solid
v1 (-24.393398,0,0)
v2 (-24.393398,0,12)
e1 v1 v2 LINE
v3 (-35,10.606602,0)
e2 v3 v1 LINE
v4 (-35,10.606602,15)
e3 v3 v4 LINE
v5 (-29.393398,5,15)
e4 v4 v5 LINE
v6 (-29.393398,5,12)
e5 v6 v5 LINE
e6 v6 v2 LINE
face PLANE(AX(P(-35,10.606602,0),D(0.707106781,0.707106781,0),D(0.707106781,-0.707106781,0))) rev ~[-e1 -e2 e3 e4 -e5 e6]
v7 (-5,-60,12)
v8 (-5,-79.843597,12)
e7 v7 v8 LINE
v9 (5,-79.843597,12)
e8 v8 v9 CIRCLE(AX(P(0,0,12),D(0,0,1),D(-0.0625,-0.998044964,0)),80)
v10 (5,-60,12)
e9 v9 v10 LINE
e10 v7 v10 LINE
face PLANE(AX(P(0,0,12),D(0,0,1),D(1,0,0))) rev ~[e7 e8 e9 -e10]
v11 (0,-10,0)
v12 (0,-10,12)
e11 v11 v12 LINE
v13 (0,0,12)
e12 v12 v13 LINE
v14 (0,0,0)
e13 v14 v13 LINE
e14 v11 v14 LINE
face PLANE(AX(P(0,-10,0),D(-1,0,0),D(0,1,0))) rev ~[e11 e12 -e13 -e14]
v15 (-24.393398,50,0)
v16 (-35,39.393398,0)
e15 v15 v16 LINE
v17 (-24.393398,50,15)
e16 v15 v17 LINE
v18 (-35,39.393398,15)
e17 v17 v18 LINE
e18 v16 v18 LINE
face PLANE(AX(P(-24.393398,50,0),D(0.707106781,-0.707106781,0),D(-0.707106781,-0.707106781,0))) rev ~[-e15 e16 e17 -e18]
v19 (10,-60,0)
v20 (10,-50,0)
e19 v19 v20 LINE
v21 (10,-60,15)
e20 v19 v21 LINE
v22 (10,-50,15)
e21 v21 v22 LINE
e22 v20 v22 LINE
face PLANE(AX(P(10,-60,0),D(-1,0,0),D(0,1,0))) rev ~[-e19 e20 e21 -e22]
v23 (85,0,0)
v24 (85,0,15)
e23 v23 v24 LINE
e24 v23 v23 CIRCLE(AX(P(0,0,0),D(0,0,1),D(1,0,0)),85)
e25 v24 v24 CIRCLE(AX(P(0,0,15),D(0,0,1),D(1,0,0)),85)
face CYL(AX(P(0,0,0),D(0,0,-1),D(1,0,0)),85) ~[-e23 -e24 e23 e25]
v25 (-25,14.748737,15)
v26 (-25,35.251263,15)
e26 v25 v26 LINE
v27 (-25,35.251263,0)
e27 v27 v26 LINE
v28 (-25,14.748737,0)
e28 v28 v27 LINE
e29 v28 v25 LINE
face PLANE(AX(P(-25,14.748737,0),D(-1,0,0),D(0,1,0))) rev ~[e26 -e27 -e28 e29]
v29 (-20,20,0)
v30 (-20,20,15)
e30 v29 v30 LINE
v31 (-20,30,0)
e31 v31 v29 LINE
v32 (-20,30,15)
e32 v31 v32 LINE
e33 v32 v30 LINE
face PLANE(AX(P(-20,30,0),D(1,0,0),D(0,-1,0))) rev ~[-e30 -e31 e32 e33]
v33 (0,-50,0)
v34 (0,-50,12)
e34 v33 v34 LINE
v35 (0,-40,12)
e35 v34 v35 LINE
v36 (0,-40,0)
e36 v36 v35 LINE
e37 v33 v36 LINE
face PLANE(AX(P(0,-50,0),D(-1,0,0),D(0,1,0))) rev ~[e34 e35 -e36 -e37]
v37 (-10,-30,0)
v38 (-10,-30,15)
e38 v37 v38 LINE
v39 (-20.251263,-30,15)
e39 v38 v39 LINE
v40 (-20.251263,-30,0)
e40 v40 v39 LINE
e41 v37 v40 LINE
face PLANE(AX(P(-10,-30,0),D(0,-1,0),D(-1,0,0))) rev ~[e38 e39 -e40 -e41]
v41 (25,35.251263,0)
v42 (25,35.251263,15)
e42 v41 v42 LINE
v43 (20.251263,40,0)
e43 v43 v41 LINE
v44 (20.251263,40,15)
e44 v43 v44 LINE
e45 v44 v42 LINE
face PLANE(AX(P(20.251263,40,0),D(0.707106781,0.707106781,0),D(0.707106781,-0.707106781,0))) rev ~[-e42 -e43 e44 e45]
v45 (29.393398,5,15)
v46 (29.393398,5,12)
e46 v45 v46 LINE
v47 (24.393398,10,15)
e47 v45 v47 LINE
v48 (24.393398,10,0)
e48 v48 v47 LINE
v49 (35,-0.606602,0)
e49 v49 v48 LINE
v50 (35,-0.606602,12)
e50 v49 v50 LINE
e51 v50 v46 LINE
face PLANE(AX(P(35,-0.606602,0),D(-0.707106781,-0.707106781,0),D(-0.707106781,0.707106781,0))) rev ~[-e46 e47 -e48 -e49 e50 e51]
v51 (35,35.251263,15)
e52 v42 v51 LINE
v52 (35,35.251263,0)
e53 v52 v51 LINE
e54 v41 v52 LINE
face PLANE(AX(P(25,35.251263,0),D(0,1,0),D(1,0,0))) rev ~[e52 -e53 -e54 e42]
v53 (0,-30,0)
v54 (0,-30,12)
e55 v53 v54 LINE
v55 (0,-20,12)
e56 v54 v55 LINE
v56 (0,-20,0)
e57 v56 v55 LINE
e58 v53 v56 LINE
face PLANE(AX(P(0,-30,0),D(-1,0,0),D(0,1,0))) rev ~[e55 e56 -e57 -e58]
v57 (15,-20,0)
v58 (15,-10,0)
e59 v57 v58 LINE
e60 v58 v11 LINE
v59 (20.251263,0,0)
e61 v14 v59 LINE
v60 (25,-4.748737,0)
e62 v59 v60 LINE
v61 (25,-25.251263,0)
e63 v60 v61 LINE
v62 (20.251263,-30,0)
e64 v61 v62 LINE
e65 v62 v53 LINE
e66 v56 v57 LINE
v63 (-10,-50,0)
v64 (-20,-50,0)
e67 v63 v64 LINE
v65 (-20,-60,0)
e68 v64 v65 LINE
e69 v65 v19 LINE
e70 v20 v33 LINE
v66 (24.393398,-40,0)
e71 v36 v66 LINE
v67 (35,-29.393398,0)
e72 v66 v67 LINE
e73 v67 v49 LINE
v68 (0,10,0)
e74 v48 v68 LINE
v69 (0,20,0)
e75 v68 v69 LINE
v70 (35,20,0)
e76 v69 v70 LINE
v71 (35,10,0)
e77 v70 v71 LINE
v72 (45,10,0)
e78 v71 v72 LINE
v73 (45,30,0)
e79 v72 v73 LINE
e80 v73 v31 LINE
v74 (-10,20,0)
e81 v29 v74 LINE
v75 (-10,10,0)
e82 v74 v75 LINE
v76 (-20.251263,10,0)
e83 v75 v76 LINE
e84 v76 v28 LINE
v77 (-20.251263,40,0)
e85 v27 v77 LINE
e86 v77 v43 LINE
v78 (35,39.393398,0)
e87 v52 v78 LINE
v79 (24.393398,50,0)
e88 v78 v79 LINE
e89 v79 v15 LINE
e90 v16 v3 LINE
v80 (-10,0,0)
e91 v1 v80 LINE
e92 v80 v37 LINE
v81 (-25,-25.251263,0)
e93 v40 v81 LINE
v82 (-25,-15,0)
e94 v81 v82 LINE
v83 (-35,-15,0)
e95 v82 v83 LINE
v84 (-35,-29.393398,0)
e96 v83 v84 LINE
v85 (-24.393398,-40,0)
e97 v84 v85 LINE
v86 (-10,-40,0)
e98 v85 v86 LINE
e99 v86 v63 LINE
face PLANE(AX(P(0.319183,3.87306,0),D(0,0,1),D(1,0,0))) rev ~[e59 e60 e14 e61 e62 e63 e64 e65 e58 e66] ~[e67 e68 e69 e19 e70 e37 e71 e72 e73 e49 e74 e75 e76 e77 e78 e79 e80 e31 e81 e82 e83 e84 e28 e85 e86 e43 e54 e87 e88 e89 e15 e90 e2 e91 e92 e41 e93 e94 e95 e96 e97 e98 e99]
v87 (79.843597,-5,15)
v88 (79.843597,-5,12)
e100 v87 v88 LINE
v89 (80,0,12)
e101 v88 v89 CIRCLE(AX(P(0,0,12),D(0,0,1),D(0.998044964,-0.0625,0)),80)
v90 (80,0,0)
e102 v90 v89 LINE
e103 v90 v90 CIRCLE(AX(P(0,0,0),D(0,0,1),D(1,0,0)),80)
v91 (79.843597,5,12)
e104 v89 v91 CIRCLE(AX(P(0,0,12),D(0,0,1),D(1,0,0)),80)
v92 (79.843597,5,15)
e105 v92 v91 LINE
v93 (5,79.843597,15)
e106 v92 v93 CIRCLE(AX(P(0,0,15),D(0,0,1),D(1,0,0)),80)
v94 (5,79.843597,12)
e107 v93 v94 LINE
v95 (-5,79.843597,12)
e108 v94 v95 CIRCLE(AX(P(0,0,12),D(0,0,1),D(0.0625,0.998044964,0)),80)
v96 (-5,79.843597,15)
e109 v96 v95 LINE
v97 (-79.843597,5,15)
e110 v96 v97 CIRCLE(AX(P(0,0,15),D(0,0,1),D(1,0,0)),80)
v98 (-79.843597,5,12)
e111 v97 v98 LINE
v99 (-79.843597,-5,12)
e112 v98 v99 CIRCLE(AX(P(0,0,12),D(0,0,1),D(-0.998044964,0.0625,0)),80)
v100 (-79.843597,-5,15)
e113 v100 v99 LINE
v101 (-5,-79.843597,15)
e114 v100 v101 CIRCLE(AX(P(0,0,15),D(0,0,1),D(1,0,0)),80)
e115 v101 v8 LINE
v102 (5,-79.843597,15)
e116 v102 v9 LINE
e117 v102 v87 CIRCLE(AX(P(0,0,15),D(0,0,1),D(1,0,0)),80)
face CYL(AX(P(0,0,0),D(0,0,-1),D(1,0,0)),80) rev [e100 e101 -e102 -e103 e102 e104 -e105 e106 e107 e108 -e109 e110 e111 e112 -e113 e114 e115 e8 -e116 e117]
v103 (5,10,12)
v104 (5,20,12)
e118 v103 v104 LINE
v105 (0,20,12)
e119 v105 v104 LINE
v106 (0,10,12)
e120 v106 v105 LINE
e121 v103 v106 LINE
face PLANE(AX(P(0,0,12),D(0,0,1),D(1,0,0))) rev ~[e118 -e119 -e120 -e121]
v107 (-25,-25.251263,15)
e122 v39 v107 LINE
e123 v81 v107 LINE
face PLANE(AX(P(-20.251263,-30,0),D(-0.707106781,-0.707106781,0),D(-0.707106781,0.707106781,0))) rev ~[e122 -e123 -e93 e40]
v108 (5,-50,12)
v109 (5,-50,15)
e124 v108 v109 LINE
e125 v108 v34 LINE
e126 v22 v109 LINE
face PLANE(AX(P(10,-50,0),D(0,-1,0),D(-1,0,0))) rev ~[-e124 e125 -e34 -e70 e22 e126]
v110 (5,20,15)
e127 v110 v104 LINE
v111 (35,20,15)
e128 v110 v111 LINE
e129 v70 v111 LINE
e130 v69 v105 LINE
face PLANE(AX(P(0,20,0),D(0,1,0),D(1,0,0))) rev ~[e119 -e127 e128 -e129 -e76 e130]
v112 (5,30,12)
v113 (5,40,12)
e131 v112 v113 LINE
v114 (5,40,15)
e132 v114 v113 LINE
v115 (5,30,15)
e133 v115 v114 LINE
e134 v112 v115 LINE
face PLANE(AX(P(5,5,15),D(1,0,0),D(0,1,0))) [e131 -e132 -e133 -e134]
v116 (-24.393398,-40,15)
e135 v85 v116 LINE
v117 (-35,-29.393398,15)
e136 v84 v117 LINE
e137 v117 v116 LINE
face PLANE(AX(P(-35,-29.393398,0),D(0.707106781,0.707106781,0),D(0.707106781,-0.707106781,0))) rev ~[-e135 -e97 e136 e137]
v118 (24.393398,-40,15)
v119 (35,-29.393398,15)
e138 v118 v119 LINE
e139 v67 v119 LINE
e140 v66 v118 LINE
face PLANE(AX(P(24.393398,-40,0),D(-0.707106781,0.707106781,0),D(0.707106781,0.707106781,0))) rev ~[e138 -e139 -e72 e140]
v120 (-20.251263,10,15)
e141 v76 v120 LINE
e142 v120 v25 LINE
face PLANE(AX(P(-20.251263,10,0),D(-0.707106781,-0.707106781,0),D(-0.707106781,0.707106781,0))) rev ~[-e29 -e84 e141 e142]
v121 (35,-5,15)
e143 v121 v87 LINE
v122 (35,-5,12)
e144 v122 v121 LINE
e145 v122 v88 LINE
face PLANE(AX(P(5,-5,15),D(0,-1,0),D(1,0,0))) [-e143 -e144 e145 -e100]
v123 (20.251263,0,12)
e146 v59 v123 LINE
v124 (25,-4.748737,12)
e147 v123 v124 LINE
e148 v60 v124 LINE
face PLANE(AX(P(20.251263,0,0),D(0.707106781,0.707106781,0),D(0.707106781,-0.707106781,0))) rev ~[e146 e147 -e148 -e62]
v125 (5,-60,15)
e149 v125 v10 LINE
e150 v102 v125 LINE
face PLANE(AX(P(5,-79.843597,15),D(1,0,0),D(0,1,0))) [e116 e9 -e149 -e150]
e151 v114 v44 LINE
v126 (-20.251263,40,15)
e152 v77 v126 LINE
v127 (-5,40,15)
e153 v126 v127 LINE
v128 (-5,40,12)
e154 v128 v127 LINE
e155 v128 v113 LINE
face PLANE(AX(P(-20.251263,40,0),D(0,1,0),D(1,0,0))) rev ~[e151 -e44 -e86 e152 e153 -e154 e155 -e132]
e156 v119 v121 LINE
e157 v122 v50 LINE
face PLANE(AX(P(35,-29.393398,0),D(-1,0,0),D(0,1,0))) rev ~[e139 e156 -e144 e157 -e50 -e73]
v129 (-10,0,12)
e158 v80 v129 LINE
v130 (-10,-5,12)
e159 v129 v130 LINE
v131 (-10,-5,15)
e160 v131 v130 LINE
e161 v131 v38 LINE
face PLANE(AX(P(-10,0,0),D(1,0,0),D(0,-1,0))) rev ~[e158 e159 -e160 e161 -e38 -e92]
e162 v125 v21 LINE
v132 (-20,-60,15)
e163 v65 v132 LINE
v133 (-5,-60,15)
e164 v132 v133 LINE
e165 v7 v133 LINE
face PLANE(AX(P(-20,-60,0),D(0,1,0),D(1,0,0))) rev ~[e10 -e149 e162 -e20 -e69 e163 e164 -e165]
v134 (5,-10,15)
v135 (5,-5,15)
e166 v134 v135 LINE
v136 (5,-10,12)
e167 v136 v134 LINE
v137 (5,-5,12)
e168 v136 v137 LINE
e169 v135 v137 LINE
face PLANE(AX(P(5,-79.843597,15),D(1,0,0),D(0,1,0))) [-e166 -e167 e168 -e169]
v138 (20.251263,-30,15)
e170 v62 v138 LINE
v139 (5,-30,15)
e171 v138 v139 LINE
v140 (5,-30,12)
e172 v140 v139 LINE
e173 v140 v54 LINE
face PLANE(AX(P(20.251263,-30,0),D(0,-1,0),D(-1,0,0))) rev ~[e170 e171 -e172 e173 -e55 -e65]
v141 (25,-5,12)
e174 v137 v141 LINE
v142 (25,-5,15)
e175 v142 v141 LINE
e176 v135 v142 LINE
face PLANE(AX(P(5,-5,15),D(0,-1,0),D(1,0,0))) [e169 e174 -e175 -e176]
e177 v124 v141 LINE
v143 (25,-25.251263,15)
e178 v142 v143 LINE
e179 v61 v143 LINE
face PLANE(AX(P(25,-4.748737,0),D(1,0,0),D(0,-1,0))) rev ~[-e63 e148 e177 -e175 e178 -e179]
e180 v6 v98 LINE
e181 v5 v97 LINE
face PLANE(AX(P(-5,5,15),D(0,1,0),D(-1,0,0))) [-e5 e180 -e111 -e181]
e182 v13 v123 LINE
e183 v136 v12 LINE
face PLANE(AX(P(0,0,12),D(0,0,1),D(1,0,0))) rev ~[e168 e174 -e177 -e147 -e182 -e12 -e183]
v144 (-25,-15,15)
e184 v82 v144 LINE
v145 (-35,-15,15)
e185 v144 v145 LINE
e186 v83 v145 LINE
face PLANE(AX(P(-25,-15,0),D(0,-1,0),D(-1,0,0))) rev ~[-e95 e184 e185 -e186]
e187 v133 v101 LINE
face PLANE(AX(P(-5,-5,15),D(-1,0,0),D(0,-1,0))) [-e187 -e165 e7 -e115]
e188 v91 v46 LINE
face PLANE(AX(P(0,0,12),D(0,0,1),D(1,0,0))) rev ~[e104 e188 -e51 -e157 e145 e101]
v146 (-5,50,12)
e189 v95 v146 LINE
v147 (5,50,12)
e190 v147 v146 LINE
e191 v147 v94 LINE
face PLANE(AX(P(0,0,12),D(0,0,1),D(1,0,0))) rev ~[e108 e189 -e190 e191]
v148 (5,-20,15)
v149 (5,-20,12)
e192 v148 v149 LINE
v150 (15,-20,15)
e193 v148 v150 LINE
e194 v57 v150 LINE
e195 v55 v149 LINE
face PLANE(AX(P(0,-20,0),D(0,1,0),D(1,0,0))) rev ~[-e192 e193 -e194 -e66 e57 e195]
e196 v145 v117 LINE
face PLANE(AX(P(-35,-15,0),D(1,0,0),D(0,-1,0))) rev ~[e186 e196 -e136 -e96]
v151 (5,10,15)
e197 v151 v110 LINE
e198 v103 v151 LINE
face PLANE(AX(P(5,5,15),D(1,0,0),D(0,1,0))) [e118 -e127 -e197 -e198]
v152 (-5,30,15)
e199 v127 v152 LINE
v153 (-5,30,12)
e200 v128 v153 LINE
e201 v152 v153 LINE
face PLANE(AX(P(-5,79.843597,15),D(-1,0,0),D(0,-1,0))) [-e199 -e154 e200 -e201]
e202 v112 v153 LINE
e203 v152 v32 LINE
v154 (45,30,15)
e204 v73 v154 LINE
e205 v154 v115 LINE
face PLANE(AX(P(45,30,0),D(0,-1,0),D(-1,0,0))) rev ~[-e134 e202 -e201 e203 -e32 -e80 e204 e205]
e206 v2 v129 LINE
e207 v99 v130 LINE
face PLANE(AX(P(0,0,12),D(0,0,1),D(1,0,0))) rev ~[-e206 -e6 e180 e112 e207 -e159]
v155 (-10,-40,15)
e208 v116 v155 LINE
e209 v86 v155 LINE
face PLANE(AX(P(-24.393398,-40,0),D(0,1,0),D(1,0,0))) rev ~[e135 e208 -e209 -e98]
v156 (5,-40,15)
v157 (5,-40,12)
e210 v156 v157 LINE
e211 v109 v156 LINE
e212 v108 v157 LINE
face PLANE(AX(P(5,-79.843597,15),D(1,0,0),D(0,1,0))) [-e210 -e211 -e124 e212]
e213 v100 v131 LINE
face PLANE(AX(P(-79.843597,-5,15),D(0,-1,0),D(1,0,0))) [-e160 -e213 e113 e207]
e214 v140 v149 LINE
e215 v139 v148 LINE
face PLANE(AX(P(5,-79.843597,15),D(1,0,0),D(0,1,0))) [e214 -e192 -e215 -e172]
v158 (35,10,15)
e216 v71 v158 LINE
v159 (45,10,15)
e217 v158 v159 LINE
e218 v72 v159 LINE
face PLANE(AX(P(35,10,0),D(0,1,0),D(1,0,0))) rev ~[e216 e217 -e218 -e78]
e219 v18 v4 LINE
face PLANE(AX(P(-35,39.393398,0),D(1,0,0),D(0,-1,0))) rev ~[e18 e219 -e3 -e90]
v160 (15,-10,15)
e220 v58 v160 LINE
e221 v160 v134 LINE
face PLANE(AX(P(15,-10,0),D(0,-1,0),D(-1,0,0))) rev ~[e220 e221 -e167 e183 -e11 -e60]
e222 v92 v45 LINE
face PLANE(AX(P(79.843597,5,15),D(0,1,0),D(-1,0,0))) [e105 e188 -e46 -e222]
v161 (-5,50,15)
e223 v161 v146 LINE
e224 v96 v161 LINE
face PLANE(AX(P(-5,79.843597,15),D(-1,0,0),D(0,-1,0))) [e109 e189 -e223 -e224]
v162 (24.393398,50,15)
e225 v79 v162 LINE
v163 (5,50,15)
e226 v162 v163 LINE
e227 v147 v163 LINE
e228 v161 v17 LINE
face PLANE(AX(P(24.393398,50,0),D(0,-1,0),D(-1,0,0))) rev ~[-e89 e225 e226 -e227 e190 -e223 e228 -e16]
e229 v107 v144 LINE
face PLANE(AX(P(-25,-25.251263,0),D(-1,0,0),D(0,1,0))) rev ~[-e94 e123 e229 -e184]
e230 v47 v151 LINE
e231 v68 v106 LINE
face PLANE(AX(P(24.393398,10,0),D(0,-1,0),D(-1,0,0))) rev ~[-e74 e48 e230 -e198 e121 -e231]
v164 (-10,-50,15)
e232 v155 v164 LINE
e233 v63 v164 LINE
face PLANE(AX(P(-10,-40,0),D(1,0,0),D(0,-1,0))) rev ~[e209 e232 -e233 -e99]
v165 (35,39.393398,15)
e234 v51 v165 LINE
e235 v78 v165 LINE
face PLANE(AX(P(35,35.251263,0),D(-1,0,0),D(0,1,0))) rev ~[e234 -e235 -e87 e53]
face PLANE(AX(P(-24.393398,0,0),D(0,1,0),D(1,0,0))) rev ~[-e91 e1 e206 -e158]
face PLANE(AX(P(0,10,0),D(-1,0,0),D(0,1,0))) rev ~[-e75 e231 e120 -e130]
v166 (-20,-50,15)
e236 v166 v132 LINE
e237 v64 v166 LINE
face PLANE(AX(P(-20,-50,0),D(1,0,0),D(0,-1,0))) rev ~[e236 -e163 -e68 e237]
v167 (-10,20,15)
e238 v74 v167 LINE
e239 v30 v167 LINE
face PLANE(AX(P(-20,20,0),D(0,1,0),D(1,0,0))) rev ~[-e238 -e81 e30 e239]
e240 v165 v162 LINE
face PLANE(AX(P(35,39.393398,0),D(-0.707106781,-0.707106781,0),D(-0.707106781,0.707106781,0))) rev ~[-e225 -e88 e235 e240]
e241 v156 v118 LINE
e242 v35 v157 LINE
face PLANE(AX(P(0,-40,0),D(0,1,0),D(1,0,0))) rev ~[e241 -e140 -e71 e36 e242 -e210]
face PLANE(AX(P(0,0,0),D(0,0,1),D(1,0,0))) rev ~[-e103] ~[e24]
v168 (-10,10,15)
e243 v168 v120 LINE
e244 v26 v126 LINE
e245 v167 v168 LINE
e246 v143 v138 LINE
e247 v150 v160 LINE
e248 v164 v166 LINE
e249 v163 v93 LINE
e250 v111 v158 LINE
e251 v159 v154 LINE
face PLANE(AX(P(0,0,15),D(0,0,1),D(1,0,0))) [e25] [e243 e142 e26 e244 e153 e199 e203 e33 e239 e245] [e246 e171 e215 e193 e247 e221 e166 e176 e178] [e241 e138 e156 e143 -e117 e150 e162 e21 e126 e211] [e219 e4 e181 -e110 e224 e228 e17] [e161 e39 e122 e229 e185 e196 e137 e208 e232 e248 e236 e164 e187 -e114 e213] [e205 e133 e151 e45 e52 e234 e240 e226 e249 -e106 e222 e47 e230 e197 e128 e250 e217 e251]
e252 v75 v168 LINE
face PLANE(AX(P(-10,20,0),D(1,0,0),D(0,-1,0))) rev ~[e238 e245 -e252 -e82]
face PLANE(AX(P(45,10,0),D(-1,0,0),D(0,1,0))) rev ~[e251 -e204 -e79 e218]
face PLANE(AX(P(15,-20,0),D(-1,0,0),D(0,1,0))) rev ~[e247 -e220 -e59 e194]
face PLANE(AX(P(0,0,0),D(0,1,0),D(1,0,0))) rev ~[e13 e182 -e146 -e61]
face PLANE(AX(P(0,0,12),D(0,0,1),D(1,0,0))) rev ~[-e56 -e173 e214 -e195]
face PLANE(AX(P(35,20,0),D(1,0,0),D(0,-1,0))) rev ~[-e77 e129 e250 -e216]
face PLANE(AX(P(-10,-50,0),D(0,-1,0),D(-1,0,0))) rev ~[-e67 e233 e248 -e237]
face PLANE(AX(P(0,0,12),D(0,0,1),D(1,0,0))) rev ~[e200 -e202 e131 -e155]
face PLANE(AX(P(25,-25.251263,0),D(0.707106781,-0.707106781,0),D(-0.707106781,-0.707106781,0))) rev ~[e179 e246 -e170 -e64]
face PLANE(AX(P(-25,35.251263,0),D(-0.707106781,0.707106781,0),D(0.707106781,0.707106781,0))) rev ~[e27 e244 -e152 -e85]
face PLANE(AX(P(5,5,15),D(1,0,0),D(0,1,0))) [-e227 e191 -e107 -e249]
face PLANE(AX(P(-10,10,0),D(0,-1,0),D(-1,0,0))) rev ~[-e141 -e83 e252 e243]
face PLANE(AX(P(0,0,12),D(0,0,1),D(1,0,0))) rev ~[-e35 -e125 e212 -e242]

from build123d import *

# Parameters (mm, degrees)
F4_DEPTH = 15
F5_R     = 85
F5_R_2   = 80
F6_DEPTH = 15
F7_W     = 10
F7_H     = 10
F8_DEPTH = 3


with BuildPart() as f4:
    # F3 (on Top) → F4 (new body)
    with BuildSketch(Plane.XY):
        Polygon((24.3933982822, 50), (-24.3933982822, 50), (-35, 39.3933982822), (-35, 10.6066017178), (-24.3933982822, 0), (-10, 0), (-10, -30), (-20.2512626585, -30), (-25, -25.2512626585), (-25, -15), (-35, -15), (-35, -29.3933982822), (-24.3933982822, -40), (-10, -40), (-10, -50), (-20, -50), (-20, -60), (10, -60), (10, -50), (0, -50), (0, -40), (24.3933982822, -40), (35, -29.3933982822), (35, -0.6066017178), (24.3933982822, 10), (0, 10), (0, 12.3223304703), (0, 20), (35, 20), (35, 10), (45, 10), (45, 30), (-20, 30), (-20, 20), (-10, 20), (-10, 18.4070525334), (-10, 10), (-20.2512626585, 10), (-25, 14.7487373415), (-25, 18.8908729653), (-25, 35.2512626585), (-20.2512626585, 40), (20.2512626585, 40), (25, 35.2512626585), (35, 35.2512626585), (35, 39.3933982822), align=None)
        Polygon((20.2512626585, 0), (25, -4.7487373415), (25, -25.2512626585), (20.2512626585, -30), (0, -30), (0, -20), (15, -20), (15, -10), (0, -10), (0, 0), align=None, mode=Mode.SUBTRACT)
    extrude(amount=F4_DEPTH)



with BuildPart() as f6:
    # F5 (on Top) → F6 (new body)
    with BuildSketch(Plane.XY):
        Circle(F5_R)
        Circle(F5_R_2, mode=Mode.SUBTRACT)
    extrude(amount=F6_DEPTH)


with BuildPart() as f4_1:
    add(f4.part)

    add(f6.part)  # F8 merges F6
    # F7 (on face) → F8 (join)
    with BuildSketch(Plane.XY.offset(15)):
        Rectangle(F7_W, F7_H)
        with BuildLine():
            Line((79.8435971134, 5), (5, 5))
            Line((5, 5), (5, -5))
            Line((5, -5), (79.8435971134, -5))
            ThreePointArc((79.8435971134, -5), (79.9608897183, -2.5012227941), (80, 0))
            ThreePointArc((80, 0), (79.9608897183, 2.5012227941), (79.8435971134, 5))
        make_face()
        with BuildLine():
            Line((-5, 79.8435971134), (-5, 5))
            Line((-5, 5), (5, 5))
            Line((5, 5), (5, 79.8435971134))
            ThreePointArc((5, 79.8435971134), (0, 80), (-5, 79.8435971134))
        make_face()
        with BuildLine():
            Line((-5, 5), (-79.8435971134, 5))
            ThreePointArc((-79.8435971134, 5), (-80, 0), (-79.8435971134, -5))
            Line((-79.8435971134, -5), (-5, -5))
            Line((-5, -5), (-5, 5))
        make_face()
        with BuildLine():
            Line((5, -5), (-5, -5))
            Line((-5, -5), (-5, -79.8435971134))
            ThreePointArc((-5, -79.8435971134), (0, -80), (5, -79.8435971134))
            Line((5, -79.8435971134), (5, -5))
        make_face()
    extrude(amount=-F8_DEPTH)


solid = f4_1.part
